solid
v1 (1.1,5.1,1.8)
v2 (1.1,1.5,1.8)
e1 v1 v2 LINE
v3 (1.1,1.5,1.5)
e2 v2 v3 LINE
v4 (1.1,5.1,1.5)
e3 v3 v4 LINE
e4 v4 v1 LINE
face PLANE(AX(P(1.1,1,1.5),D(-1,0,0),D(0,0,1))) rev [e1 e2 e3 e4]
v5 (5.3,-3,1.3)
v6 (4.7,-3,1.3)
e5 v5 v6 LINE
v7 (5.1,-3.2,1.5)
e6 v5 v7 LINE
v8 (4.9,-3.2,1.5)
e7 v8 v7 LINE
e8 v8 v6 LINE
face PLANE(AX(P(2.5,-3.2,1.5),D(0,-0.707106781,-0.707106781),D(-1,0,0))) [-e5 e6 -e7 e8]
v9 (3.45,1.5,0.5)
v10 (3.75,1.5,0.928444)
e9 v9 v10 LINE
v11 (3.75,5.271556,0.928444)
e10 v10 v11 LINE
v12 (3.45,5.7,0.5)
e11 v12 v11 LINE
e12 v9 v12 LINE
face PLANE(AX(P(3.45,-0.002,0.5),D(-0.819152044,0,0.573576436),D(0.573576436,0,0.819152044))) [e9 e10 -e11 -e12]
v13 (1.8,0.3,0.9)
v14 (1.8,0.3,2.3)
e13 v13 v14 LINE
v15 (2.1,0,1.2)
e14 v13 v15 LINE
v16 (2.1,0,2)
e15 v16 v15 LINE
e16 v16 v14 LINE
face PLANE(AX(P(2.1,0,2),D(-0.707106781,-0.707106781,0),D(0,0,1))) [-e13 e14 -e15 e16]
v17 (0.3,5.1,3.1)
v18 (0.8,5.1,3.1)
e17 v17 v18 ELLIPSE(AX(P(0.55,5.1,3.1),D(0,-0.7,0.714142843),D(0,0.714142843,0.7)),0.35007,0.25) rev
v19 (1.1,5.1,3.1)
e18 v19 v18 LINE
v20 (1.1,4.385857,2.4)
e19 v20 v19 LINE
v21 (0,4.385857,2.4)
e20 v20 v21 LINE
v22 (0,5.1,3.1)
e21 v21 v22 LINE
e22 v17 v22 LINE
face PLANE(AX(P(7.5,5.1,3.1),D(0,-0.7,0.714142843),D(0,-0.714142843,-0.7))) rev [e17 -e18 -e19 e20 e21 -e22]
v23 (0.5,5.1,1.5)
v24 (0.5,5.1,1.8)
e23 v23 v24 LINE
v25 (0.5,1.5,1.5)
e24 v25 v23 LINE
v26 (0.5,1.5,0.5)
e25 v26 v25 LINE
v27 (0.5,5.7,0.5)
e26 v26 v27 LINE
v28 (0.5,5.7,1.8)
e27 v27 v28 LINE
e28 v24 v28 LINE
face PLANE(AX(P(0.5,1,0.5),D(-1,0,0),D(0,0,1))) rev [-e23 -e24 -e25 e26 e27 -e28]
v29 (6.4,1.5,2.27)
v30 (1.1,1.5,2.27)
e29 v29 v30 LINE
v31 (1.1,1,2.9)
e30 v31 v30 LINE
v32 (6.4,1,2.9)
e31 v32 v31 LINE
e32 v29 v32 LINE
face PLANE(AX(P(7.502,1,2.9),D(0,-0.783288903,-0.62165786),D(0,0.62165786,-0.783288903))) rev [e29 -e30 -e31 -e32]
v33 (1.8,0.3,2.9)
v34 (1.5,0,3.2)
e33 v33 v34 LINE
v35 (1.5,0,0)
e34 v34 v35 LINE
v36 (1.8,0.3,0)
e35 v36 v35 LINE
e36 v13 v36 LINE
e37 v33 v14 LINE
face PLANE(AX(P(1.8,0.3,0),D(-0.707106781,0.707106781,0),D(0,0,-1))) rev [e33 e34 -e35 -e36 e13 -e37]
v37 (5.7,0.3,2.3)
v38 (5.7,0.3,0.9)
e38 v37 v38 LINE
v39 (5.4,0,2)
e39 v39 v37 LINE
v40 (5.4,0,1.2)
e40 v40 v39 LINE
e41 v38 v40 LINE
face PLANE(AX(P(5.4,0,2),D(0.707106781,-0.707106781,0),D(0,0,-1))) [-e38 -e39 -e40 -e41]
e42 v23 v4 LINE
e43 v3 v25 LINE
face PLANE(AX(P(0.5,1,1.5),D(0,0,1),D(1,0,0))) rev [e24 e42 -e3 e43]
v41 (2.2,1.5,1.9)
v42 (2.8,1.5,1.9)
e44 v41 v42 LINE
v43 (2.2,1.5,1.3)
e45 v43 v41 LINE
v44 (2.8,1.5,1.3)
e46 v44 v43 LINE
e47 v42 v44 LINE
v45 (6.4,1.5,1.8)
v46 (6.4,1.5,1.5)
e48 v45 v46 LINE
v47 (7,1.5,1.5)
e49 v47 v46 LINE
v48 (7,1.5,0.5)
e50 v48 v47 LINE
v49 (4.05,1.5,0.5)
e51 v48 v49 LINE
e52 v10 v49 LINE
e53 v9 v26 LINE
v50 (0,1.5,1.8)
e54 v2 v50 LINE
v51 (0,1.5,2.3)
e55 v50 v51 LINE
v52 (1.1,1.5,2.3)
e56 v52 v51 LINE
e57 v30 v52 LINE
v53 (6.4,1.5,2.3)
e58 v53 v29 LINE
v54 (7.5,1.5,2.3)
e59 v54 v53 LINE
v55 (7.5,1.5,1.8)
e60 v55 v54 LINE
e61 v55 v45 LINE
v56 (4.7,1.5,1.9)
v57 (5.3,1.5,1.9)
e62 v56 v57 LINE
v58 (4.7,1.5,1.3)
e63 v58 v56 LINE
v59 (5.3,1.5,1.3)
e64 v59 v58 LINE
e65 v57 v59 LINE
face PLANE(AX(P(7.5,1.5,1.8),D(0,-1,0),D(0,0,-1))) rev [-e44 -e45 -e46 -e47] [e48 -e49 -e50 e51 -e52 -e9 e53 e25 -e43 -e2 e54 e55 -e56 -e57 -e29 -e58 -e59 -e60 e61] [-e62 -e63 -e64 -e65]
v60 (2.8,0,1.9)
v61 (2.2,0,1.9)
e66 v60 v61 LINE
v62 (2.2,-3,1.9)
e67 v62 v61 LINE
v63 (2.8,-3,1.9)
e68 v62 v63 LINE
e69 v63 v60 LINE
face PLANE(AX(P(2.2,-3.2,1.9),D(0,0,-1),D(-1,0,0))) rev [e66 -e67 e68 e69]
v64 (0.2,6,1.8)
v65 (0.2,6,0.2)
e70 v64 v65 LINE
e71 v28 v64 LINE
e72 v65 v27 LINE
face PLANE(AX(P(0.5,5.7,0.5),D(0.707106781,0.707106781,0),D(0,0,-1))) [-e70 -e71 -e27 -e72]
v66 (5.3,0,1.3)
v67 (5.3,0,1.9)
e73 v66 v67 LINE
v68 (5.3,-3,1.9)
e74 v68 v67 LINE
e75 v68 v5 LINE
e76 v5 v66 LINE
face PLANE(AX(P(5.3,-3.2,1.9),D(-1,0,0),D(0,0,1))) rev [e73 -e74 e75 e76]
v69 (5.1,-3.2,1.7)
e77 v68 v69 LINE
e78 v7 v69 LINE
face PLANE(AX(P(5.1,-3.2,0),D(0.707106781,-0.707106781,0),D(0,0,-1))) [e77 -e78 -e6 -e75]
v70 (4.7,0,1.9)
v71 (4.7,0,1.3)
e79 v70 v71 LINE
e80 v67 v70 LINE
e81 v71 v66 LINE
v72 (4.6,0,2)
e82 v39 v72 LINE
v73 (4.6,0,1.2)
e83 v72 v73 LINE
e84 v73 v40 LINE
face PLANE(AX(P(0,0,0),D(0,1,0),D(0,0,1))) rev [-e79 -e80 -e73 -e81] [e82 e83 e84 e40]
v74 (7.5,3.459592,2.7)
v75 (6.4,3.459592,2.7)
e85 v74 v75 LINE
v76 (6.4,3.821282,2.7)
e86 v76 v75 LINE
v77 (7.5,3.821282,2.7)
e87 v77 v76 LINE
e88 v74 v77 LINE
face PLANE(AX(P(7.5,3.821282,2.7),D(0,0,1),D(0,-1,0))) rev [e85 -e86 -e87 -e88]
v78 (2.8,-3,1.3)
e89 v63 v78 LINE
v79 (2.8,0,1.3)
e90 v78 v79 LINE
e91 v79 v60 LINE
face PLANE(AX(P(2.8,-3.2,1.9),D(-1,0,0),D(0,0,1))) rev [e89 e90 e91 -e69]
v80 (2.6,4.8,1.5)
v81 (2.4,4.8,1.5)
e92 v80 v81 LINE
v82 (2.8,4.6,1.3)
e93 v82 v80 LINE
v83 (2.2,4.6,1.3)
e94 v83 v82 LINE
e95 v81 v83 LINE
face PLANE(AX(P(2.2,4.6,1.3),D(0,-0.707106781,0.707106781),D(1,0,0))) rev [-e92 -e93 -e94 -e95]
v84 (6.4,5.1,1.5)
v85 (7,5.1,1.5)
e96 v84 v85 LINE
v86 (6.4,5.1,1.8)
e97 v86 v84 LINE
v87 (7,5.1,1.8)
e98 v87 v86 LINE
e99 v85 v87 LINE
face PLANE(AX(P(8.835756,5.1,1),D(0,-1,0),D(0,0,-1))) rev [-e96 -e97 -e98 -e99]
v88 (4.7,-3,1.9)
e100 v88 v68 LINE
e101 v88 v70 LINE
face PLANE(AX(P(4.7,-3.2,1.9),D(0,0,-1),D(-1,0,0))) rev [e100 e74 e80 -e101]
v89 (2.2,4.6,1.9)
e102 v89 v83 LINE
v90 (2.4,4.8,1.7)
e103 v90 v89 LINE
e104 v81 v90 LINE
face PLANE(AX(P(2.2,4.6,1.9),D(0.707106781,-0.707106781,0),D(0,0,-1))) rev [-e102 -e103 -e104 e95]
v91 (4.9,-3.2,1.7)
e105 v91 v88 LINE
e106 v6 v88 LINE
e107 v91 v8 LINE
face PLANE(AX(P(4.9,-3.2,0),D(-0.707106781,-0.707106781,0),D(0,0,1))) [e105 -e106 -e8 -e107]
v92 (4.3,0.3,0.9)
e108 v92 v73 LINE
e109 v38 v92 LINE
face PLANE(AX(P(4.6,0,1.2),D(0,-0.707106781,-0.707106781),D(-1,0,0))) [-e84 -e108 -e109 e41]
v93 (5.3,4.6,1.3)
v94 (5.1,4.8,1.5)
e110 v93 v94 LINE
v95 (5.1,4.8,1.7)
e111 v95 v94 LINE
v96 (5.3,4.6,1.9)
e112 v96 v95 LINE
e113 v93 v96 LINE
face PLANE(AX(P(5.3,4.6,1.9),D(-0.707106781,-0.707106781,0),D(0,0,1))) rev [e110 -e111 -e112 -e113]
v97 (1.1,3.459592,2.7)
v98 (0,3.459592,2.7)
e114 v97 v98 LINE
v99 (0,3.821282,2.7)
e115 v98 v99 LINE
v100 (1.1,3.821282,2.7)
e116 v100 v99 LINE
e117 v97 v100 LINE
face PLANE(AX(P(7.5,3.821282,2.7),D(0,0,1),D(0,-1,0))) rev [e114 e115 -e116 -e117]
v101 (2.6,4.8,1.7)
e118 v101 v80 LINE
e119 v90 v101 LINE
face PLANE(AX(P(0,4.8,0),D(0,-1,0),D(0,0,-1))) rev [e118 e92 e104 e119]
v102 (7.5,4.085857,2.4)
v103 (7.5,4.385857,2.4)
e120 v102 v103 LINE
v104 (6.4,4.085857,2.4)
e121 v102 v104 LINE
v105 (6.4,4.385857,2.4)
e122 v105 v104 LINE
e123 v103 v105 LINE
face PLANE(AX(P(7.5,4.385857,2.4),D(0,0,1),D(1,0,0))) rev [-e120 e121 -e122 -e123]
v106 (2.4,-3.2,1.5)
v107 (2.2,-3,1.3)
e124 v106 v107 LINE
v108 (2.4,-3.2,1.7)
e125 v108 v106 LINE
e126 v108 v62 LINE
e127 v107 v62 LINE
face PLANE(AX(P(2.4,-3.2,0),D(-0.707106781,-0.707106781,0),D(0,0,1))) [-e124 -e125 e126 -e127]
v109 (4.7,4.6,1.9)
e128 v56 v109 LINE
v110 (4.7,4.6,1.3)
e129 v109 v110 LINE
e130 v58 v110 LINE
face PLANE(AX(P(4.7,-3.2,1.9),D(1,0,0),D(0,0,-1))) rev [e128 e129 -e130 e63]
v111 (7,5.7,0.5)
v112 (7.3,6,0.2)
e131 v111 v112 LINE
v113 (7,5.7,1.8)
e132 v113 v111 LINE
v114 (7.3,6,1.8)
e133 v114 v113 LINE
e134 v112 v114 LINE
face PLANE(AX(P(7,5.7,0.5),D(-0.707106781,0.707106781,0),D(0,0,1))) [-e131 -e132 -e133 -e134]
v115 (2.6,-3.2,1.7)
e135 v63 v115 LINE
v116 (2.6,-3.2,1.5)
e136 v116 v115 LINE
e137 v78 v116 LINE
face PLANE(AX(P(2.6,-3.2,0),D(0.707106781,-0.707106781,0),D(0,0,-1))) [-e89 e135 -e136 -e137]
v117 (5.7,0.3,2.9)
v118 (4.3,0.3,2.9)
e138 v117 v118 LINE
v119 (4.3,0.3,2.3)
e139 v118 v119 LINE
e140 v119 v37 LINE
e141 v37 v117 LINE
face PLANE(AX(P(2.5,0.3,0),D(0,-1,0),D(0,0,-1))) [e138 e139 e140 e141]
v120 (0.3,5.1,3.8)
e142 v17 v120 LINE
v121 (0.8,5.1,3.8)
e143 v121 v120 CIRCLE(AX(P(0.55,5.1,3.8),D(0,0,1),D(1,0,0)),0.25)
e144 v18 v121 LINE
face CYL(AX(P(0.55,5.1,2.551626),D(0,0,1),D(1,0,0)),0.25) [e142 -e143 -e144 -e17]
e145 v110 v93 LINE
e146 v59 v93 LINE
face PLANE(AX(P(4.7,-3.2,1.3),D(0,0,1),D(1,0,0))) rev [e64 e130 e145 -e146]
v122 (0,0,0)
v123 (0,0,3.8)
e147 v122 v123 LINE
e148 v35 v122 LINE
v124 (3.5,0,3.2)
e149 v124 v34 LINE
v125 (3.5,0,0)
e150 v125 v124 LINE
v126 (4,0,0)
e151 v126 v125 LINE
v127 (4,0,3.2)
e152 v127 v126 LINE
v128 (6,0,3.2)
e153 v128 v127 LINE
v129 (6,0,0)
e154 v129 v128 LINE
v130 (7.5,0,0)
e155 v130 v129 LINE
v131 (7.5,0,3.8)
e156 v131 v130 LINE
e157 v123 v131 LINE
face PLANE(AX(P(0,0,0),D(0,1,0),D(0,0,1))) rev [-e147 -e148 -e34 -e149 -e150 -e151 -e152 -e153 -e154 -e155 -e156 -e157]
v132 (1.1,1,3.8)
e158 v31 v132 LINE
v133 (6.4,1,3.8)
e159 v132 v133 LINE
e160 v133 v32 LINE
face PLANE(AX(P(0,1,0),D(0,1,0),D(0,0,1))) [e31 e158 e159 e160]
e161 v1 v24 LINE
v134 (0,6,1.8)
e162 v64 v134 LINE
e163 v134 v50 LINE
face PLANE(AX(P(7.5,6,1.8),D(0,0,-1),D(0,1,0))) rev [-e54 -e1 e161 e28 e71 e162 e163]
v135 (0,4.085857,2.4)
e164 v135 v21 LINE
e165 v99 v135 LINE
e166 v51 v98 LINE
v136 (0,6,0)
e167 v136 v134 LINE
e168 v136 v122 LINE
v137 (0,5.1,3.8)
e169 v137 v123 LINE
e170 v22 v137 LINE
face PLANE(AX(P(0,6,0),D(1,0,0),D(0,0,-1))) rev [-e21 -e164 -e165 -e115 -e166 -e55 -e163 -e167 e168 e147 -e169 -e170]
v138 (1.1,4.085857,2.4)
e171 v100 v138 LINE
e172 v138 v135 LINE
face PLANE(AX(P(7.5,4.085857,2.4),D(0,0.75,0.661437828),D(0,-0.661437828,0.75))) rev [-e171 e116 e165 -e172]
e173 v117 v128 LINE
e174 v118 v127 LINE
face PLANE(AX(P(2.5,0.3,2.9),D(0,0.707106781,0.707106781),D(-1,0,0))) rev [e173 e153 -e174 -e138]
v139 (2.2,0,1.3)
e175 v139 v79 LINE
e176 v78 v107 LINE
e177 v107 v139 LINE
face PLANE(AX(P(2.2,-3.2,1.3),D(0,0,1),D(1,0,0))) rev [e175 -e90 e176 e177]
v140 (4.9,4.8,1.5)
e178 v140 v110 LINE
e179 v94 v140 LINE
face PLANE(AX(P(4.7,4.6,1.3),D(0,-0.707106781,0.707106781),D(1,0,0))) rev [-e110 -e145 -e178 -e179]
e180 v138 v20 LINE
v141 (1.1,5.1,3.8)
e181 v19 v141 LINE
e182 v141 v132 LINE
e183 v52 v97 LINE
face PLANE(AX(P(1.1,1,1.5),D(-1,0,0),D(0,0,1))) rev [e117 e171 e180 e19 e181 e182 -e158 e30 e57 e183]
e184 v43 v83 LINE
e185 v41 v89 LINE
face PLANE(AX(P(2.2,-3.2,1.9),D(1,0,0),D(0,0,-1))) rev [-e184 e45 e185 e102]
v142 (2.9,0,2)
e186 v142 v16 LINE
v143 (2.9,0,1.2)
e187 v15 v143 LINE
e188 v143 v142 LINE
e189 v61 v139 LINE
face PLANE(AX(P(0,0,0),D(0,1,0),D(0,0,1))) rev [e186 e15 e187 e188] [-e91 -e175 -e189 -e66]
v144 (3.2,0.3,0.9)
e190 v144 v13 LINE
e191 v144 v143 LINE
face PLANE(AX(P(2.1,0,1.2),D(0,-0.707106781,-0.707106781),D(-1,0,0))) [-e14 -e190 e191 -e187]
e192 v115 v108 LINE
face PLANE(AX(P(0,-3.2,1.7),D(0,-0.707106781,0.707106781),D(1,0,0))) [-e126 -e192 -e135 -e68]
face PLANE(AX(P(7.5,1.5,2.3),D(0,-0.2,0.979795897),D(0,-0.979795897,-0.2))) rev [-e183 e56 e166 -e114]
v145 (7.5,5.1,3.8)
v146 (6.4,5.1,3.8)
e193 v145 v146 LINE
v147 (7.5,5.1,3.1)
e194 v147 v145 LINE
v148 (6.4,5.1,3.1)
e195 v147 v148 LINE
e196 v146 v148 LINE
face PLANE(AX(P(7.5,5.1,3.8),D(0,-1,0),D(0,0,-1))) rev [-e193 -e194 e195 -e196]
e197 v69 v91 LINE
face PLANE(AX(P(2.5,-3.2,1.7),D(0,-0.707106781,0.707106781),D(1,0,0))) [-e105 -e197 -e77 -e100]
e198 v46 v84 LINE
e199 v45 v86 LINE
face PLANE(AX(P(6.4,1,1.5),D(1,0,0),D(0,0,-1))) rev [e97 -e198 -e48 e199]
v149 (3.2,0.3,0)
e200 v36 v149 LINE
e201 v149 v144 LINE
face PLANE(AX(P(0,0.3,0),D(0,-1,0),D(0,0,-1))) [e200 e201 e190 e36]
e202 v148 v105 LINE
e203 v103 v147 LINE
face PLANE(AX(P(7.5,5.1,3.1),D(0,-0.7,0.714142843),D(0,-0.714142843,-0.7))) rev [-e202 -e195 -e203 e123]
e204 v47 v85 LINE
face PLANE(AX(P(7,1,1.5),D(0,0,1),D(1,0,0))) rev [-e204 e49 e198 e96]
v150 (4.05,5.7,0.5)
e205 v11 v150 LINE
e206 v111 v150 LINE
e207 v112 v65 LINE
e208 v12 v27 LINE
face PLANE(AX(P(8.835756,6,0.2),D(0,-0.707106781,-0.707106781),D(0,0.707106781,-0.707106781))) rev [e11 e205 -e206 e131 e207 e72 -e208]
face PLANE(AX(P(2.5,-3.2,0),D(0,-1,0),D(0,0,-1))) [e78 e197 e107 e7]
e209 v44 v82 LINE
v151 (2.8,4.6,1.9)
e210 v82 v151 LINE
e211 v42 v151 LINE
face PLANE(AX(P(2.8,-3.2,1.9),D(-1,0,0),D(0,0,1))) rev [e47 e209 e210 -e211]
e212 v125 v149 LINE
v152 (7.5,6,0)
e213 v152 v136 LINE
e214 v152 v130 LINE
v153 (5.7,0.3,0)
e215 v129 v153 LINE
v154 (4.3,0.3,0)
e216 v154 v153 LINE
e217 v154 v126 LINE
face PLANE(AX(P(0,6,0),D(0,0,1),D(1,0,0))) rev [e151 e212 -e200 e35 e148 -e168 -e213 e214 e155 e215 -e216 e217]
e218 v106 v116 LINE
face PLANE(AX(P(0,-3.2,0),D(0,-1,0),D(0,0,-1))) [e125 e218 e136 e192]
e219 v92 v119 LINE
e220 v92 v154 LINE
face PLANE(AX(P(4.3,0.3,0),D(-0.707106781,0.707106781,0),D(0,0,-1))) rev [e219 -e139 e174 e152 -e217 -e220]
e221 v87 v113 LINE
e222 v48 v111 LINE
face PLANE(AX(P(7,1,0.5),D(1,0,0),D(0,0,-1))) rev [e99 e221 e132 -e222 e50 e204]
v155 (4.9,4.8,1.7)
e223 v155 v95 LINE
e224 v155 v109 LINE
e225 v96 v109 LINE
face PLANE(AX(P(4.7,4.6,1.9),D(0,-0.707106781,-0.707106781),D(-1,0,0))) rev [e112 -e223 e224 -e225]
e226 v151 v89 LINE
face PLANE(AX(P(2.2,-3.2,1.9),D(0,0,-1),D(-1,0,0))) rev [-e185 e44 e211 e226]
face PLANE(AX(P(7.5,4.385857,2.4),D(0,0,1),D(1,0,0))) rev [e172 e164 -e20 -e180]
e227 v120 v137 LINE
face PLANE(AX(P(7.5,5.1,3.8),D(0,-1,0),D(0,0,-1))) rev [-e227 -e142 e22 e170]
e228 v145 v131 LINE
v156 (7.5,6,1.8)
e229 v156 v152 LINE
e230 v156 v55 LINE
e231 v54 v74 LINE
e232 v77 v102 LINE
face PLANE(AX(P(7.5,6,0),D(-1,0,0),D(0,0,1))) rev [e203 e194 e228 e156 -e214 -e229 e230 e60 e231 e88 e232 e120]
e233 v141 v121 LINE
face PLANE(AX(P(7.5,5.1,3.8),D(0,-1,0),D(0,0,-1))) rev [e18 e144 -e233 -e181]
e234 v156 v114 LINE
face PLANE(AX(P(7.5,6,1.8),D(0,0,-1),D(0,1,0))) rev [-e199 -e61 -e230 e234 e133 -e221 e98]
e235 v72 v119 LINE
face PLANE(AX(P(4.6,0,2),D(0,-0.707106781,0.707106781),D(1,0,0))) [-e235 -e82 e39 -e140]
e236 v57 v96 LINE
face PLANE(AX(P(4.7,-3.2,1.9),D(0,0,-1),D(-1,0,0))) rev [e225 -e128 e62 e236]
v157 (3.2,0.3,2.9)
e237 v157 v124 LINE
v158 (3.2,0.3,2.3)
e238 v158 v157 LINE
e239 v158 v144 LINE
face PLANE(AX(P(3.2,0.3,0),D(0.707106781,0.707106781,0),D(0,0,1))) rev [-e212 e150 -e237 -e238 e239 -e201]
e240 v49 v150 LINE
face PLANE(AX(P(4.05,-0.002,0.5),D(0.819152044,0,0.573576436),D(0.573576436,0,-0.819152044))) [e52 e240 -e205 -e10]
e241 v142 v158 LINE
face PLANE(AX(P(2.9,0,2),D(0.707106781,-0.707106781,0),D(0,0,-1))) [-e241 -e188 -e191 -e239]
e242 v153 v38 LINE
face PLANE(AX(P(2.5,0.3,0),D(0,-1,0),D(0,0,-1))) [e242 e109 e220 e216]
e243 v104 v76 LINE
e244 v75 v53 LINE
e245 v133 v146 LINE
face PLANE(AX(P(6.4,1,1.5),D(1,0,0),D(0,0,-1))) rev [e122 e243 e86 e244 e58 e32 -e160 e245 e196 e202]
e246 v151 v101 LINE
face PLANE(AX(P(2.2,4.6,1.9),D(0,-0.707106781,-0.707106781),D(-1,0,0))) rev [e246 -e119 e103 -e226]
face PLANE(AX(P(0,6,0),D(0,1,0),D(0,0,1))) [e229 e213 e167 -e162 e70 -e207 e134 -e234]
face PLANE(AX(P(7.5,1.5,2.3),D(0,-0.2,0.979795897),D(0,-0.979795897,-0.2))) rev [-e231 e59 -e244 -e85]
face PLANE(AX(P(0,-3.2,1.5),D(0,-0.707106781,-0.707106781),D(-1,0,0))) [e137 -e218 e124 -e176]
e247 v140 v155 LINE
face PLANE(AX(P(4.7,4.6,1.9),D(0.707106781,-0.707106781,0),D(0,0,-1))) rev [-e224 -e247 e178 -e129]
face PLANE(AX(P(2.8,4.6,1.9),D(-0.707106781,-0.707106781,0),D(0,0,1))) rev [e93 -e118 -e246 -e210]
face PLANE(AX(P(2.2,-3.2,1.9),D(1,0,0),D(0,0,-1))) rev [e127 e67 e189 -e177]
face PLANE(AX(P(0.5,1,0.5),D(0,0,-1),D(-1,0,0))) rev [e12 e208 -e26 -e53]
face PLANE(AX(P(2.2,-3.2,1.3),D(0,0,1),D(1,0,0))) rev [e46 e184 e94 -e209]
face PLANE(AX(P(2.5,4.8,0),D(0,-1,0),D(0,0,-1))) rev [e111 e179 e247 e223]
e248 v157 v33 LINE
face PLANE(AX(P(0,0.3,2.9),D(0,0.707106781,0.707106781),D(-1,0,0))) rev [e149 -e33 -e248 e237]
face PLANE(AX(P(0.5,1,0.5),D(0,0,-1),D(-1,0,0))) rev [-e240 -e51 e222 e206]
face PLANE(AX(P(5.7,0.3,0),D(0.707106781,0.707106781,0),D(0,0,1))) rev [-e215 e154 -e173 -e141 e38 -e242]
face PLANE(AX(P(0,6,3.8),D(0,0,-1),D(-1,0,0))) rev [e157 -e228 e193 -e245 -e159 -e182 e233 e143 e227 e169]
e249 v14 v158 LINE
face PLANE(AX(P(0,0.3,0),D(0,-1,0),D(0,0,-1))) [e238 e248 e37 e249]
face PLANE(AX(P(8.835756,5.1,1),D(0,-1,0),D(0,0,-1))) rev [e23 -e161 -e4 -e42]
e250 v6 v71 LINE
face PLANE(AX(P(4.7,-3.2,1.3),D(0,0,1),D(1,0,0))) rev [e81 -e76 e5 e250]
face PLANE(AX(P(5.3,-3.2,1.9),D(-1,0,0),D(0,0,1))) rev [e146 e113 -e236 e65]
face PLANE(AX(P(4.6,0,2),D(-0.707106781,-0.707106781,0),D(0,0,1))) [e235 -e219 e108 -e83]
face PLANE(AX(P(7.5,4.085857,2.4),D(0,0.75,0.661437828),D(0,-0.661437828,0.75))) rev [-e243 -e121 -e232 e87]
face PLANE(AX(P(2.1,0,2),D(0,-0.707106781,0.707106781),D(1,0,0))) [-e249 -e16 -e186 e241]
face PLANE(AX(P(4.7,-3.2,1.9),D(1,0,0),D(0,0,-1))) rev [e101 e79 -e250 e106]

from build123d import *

# Parameters (mm, degrees)
SKETCH_1_W                         = 7.5
SKETCH_1_H                         = 3.8
EXTRUDE_1_DEPTH                    = 6
CUT_EXTRUDE_1_DEPTH                = 5
CUT_EXTRUDE_2_DEPTH                = 11.329085148
EXTRUDE_2_REACH                    = 12.329
CUT_EXTRUDE_3_REACH                = 12.329
SKETCH_5_W                         = 5.3
SKETCH_5_H                         = 4.1
EXTRUDE_3_REACH                    = 11.972
EXTRUDE_5_REACH                    = 12.329
SKETCH_11_W                        = 2
SKETCH_11_H                        = 3.2
SKETCH_11_W_2                      = 0.8
SKETCH_11_H_2                      = 0.8
CUT_EXTRUDE_5_DEPTH                = 0.3
SKETCH_15_R                        = 0.05
CUT_EXTRUDE_6_DEPTH                = 0.1
CHAMFER_7_SIZE                     = 0.3
EXTRUDE_START                      = -4.8
SKETCH_7_W                         = 0.6
SKETCH_7_H                         = 0.6
EXTRUDE_4_DEPTH                    = 8
CHAMFER_6_SIZE                     = 0.2
PATTERN_LINEAR_1_COUNT             = 2
PATTERN_LINEAR_1_PITCH             = 2.5
CHAMFER_7_OF_PATTERN_LINEAR_1_SIZE = 0.3
CHAMFER_6_OF_PATTERN_LINEAR_1_SIZE = 0.2
CUT_EXTRUDE_4_REACH                = 11.972
CHAMFER_5_SIZE                     = 0.3


with BuildPart() as part:
    # Эскиз1 → Бобышка-Вытянуть1 (new body)
    with BuildSketch(Plane(origin=(0, 0, 0), x_dir=(1, 0, 0), z_dir=(0, 1, 0))):
        with Locations((3.75, -1.9)):
            Rectangle(SKETCH_1_W, SKETCH_1_H)
    extrude(amount=EXTRUDE_1_DEPTH)

    # Эскиз2 → Вырез-Вытянуть1 (cut)
    with BuildSketch(Plane(origin=(0, 6, 0), x_dir=(1, 0, 0), z_dir=(0, 1, 0))):
        Polygon((0.5, -0.5), (7, -0.5), (7, -1.5), (6.4, -1.5), (6.4, -3.3), (1.1, -3.3), (1.1, -1.5), (0.5, -1.5), align=None)
    extrude(amount=-CUT_EXTRUDE_1_DEPTH, mode=Mode.SUBTRACT)

    # Эскиз3 → Вырез-Вытянуть2 (cut, through all)
    with BuildSketch(Plane.ZY):
        Polygon((1.8, 6), (1.8, 1.5), (2.3, 1.5), (2.7, 3.459591794), (2.7, 3.821282026), (2.4, 4.085857157), (2.4, 4.385857157), (3.1, 5.1), (3.8, 5.1), (3.8, 6), align=None)
    extrude(amount=-CUT_EXTRUDE_2_DEPTH, mode=Mode.SUBTRACT)

    # Бобышка-Вытянуть2: up to this plane
    extrude_2_end = Plane(origin=(7.5, 5.1, 3.1), z_dir=(0, -0.6999999999999996, 0.7141428428542854))
    # Эскиз4 → Бобышка-Вытянуть2 (add, up to the surface)
    with BuildSketch(Plane.XY.offset(3.8), mode=Mode.PRIVATE) as extrude_2_sk1:
        with BuildLine():
            Line((0.3, 5.1), (0.8, 5.1))
            ThreePointArc((0.8, 5.1), (0.55, 5.35), (0.3, 5.1))
        make_face()
    extrude_2_tool1 = split(extrude(extrude_2_sk1.sketch, amount=-EXTRUDE_2_REACH, mode=Mode.PRIVATE), bisect_by=extrude_2_end, keep=Keep.BOTH, mode=Mode.PRIVATE)
    add(extrude_2_tool1.solids().sort_by_distance((0.55, 5.206103, 3.8))[0])

    # Эскиз5 → Вырез-Вытянуть3 (cut, up to next)
    with BuildSketch(Plane.XY.offset(3.8), mode=Mode.PRIVATE) as cut_extrude_3_sk1:
        with Locations((3.75, 3.05)):
            Rectangle(SKETCH_5_W, SKETCH_5_H)
    cut_extrude_3_tool1 = extrude(cut_extrude_3_sk1.sketch, amount=-CUT_EXTRUDE_3_REACH, mode=Mode.PRIVATE) & part.part
    add(cut_extrude_3_tool1.solids().sort_by_distance((3.75, 3.05, 3.8))[0], mode=Mode.SUBTRACT)

    # Эскиз6 → Бобышка-Вытянуть3 (add, up to next)
    with BuildSketch(Plane(origin=(0.5, 0, 0), x_dir=(0, 0, -1), z_dir=(1, 0, 0)), mode=Mode.PRIVATE) as extrude_3_sk1:
        Polygon((-2.9, 1), (-2.27, 1.5), (-0.5, 1.5), (-0.5, 1), align=None)
    extrude_3_tool1 = extrude(extrude_3_sk1.sketch, amount=EXTRUDE_3_REACH, mode=Mode.PRIVATE) - part.part
    add(extrude_3_tool1.solids().sort_by_distance((0.5, 1.23741, 1.550432))[0])

    # Эскиз9 → Бобышка-Вытянуть5 (add, up to next)
    with BuildSketch(Plane(origin=(0, 6, 0), x_dir=(1, 0, 0), z_dir=(0, 1, 0)), mode=Mode.PRIVATE) as extrude_5_sk1:
        Polygon((3.45, -0.5), (3.75, -0.928444402), (4.05, -0.5), align=None)
    extrude_5_tool1 = extrude(extrude_5_sk1.sketch, amount=-EXTRUDE_5_REACH, mode=Mode.PRIVATE) - part.part
    add(extrude_5_tool1.solids().sort_by_distance((3.75, 6, 0.642815))[0])

    # Эскиз11 → Вырез-Вытянуть5 (cut)
    with BuildSketch(Plane.XZ):
        with Locations((2.5, 1.6)):
            Rectangle(SKETCH_11_W, SKETCH_11_H)
        with Locations((2.5, 1.6)):
            Rectangle(SKETCH_11_W_2, SKETCH_11_H_2, mode=Mode.SUBTRACT)
    cut_extrude_5 = extrude(amount=-CUT_EXTRUDE_5_DEPTH, mode=Mode.SUBTRACT)

    # Эскиз15 → Вырез-Вытянуть6 (cut)
    with BuildSketch(Plane.XZ):
        with Locations(Location((2.5, 1.6, 0), (0, 0, 270))):
            Circle(SKETCH_15_R)
    extrude(amount=-CUT_EXTRUDE_6_DEPTH, mode=Mode.SUBTRACT)

    # Фаска7
    chamfer_7_edges = [part.edges().sort_by_distance(p)[0] for p in [
        (1.5, 0.3, 1.6),
        (2.5, 0.3, 3.2),
        (3.5, 0.3, 1.6),
        (2.9, 0.3, 1.6),
        (2.5, 0.3, 2),
        (2.1, 0.3, 1.6),
        (2.5, 0.3, 1.2),
    ]]
    chamfer(chamfer_7_edges, length=CHAMFER_7_SIZE - 0.0001)  # a hair under: the kernel refuses the full size

    # Эскиз7 → Бобышка-Вытянуть4 (add)
    with BuildSketch(Plane.XZ.offset(EXTRUDE_START)):
        with Locations((2.5, 1.6)):
            Rectangle(SKETCH_7_W, SKETCH_7_H)
    extrude_4 = extrude(amount=EXTRUDE_4_DEPTH)

    # Фаска6
    chamfer_6_edges = [part.edges().sort_by_distance(p)[0] for p in [
        (2.8, 4.8, 1.6),
        (2.5, 4.8, 1.9),
        (2.2, 4.8, 1.6),
        (2.5, 4.8, 1.3),
        (2.8, -3.2, 1.6),
        (2.5, -3.2, 1.9),
        (2.2, -3.2, 1.6),
        (2.5, -3.2, 1.3),
    ]]
    chamfer(chamfer_6_edges, length=CHAMFER_6_SIZE)

    # Линейный массив1: Вырез-Вытянуть5, Бобышка-Вытянуть4 ×2
    with Locations(*[(i * PATTERN_LINEAR_1_PITCH, 0, 0) for i in range(1, PATTERN_LINEAR_1_COUNT)]):
        add(cut_extrude_5, mode=Mode.SUBTRACT)
        add(extrude_4)

    # Фаска7 of Линейный массив1
    chamfer_7_of_pattern_linear_1_edges = [part.edges().sort_by_distance(p)[0] for p in [
        (4, 0.3, 1.6),
        (5, 0.3, 3.2),
        (6, 0.3, 1.6),
        (5.4, 0.3, 1.6),
        (5, 0.3, 2),
        (4.6, 0.3, 1.6),
        (5, 0.3, 1.2),
    ]]
    chamfer(chamfer_7_of_pattern_linear_1_edges, length=CHAMFER_7_OF_PATTERN_LINEAR_1_SIZE - 0.0001)  # a hair under: the kernel refuses the full size

    # Фаска6 of Линейный массив1
    chamfer_6_of_pattern_linear_1_edges = [part.edges().sort_by_distance(p)[0] for p in [
        (5.3, 4.8, 1.6),
        (5, 4.8, 1.9),
        (4.7, 4.8, 1.6),
        (5, 4.8, 1.3),
        (5.3, -3.2, 1.6),
        (5, -3.2, 1.9),
        (4.7, -3.2, 1.6),
        (5, -3.2, 1.3),
    ]]
    chamfer(chamfer_6_of_pattern_linear_1_edges, length=CHAMFER_6_OF_PATTERN_LINEAR_1_SIZE)

    # Вырез-Вытянуть4: up to this face of the body (flat: up to its plane)
    cut_extrude_4_end = Plane(part.part.faces().sort_by_distance((7, 3.75, 1))[0])
    # Эскиз10 → Вырез-Вытянуть4 (cut, up to the picked face)
    with BuildSketch(Plane(origin=(0.5, 0, 0), x_dir=(0, 0, -1), z_dir=(1, 0, 0)), mode=Mode.PRIVATE) as cut_extrude_4_sk1:
        Polygon((-1, 6), (-0.2, 6), (-1, 5.2), (-1, 5.1), (-1.8, 5.1), (-1.8, 6), align=None)
    cut_extrude_4_tool1 = split(extrude(cut_extrude_4_sk1.sketch, amount=CUT_EXTRUDE_4_REACH, mode=Mode.PRIVATE), bisect_by=cut_extrude_4_end, keep=Keep.BOTH, mode=Mode.PRIVATE)
    add(cut_extrude_4_tool1.solids().sort_by(Axis((0.5, 5.60641, 1.194872), (1, 0, 0)))[0], mode=Mode.SUBTRACT)

    # Фаска5
    chamfer_5_edges = [part.edges().sort_by_distance(p)[0] for p in [
        (7, 6, 1),
        (0.5, 6, 1),
    ]]
    chamfer(chamfer_5_edges, length=CHAMFER_5_SIZE)


solid = part.part
